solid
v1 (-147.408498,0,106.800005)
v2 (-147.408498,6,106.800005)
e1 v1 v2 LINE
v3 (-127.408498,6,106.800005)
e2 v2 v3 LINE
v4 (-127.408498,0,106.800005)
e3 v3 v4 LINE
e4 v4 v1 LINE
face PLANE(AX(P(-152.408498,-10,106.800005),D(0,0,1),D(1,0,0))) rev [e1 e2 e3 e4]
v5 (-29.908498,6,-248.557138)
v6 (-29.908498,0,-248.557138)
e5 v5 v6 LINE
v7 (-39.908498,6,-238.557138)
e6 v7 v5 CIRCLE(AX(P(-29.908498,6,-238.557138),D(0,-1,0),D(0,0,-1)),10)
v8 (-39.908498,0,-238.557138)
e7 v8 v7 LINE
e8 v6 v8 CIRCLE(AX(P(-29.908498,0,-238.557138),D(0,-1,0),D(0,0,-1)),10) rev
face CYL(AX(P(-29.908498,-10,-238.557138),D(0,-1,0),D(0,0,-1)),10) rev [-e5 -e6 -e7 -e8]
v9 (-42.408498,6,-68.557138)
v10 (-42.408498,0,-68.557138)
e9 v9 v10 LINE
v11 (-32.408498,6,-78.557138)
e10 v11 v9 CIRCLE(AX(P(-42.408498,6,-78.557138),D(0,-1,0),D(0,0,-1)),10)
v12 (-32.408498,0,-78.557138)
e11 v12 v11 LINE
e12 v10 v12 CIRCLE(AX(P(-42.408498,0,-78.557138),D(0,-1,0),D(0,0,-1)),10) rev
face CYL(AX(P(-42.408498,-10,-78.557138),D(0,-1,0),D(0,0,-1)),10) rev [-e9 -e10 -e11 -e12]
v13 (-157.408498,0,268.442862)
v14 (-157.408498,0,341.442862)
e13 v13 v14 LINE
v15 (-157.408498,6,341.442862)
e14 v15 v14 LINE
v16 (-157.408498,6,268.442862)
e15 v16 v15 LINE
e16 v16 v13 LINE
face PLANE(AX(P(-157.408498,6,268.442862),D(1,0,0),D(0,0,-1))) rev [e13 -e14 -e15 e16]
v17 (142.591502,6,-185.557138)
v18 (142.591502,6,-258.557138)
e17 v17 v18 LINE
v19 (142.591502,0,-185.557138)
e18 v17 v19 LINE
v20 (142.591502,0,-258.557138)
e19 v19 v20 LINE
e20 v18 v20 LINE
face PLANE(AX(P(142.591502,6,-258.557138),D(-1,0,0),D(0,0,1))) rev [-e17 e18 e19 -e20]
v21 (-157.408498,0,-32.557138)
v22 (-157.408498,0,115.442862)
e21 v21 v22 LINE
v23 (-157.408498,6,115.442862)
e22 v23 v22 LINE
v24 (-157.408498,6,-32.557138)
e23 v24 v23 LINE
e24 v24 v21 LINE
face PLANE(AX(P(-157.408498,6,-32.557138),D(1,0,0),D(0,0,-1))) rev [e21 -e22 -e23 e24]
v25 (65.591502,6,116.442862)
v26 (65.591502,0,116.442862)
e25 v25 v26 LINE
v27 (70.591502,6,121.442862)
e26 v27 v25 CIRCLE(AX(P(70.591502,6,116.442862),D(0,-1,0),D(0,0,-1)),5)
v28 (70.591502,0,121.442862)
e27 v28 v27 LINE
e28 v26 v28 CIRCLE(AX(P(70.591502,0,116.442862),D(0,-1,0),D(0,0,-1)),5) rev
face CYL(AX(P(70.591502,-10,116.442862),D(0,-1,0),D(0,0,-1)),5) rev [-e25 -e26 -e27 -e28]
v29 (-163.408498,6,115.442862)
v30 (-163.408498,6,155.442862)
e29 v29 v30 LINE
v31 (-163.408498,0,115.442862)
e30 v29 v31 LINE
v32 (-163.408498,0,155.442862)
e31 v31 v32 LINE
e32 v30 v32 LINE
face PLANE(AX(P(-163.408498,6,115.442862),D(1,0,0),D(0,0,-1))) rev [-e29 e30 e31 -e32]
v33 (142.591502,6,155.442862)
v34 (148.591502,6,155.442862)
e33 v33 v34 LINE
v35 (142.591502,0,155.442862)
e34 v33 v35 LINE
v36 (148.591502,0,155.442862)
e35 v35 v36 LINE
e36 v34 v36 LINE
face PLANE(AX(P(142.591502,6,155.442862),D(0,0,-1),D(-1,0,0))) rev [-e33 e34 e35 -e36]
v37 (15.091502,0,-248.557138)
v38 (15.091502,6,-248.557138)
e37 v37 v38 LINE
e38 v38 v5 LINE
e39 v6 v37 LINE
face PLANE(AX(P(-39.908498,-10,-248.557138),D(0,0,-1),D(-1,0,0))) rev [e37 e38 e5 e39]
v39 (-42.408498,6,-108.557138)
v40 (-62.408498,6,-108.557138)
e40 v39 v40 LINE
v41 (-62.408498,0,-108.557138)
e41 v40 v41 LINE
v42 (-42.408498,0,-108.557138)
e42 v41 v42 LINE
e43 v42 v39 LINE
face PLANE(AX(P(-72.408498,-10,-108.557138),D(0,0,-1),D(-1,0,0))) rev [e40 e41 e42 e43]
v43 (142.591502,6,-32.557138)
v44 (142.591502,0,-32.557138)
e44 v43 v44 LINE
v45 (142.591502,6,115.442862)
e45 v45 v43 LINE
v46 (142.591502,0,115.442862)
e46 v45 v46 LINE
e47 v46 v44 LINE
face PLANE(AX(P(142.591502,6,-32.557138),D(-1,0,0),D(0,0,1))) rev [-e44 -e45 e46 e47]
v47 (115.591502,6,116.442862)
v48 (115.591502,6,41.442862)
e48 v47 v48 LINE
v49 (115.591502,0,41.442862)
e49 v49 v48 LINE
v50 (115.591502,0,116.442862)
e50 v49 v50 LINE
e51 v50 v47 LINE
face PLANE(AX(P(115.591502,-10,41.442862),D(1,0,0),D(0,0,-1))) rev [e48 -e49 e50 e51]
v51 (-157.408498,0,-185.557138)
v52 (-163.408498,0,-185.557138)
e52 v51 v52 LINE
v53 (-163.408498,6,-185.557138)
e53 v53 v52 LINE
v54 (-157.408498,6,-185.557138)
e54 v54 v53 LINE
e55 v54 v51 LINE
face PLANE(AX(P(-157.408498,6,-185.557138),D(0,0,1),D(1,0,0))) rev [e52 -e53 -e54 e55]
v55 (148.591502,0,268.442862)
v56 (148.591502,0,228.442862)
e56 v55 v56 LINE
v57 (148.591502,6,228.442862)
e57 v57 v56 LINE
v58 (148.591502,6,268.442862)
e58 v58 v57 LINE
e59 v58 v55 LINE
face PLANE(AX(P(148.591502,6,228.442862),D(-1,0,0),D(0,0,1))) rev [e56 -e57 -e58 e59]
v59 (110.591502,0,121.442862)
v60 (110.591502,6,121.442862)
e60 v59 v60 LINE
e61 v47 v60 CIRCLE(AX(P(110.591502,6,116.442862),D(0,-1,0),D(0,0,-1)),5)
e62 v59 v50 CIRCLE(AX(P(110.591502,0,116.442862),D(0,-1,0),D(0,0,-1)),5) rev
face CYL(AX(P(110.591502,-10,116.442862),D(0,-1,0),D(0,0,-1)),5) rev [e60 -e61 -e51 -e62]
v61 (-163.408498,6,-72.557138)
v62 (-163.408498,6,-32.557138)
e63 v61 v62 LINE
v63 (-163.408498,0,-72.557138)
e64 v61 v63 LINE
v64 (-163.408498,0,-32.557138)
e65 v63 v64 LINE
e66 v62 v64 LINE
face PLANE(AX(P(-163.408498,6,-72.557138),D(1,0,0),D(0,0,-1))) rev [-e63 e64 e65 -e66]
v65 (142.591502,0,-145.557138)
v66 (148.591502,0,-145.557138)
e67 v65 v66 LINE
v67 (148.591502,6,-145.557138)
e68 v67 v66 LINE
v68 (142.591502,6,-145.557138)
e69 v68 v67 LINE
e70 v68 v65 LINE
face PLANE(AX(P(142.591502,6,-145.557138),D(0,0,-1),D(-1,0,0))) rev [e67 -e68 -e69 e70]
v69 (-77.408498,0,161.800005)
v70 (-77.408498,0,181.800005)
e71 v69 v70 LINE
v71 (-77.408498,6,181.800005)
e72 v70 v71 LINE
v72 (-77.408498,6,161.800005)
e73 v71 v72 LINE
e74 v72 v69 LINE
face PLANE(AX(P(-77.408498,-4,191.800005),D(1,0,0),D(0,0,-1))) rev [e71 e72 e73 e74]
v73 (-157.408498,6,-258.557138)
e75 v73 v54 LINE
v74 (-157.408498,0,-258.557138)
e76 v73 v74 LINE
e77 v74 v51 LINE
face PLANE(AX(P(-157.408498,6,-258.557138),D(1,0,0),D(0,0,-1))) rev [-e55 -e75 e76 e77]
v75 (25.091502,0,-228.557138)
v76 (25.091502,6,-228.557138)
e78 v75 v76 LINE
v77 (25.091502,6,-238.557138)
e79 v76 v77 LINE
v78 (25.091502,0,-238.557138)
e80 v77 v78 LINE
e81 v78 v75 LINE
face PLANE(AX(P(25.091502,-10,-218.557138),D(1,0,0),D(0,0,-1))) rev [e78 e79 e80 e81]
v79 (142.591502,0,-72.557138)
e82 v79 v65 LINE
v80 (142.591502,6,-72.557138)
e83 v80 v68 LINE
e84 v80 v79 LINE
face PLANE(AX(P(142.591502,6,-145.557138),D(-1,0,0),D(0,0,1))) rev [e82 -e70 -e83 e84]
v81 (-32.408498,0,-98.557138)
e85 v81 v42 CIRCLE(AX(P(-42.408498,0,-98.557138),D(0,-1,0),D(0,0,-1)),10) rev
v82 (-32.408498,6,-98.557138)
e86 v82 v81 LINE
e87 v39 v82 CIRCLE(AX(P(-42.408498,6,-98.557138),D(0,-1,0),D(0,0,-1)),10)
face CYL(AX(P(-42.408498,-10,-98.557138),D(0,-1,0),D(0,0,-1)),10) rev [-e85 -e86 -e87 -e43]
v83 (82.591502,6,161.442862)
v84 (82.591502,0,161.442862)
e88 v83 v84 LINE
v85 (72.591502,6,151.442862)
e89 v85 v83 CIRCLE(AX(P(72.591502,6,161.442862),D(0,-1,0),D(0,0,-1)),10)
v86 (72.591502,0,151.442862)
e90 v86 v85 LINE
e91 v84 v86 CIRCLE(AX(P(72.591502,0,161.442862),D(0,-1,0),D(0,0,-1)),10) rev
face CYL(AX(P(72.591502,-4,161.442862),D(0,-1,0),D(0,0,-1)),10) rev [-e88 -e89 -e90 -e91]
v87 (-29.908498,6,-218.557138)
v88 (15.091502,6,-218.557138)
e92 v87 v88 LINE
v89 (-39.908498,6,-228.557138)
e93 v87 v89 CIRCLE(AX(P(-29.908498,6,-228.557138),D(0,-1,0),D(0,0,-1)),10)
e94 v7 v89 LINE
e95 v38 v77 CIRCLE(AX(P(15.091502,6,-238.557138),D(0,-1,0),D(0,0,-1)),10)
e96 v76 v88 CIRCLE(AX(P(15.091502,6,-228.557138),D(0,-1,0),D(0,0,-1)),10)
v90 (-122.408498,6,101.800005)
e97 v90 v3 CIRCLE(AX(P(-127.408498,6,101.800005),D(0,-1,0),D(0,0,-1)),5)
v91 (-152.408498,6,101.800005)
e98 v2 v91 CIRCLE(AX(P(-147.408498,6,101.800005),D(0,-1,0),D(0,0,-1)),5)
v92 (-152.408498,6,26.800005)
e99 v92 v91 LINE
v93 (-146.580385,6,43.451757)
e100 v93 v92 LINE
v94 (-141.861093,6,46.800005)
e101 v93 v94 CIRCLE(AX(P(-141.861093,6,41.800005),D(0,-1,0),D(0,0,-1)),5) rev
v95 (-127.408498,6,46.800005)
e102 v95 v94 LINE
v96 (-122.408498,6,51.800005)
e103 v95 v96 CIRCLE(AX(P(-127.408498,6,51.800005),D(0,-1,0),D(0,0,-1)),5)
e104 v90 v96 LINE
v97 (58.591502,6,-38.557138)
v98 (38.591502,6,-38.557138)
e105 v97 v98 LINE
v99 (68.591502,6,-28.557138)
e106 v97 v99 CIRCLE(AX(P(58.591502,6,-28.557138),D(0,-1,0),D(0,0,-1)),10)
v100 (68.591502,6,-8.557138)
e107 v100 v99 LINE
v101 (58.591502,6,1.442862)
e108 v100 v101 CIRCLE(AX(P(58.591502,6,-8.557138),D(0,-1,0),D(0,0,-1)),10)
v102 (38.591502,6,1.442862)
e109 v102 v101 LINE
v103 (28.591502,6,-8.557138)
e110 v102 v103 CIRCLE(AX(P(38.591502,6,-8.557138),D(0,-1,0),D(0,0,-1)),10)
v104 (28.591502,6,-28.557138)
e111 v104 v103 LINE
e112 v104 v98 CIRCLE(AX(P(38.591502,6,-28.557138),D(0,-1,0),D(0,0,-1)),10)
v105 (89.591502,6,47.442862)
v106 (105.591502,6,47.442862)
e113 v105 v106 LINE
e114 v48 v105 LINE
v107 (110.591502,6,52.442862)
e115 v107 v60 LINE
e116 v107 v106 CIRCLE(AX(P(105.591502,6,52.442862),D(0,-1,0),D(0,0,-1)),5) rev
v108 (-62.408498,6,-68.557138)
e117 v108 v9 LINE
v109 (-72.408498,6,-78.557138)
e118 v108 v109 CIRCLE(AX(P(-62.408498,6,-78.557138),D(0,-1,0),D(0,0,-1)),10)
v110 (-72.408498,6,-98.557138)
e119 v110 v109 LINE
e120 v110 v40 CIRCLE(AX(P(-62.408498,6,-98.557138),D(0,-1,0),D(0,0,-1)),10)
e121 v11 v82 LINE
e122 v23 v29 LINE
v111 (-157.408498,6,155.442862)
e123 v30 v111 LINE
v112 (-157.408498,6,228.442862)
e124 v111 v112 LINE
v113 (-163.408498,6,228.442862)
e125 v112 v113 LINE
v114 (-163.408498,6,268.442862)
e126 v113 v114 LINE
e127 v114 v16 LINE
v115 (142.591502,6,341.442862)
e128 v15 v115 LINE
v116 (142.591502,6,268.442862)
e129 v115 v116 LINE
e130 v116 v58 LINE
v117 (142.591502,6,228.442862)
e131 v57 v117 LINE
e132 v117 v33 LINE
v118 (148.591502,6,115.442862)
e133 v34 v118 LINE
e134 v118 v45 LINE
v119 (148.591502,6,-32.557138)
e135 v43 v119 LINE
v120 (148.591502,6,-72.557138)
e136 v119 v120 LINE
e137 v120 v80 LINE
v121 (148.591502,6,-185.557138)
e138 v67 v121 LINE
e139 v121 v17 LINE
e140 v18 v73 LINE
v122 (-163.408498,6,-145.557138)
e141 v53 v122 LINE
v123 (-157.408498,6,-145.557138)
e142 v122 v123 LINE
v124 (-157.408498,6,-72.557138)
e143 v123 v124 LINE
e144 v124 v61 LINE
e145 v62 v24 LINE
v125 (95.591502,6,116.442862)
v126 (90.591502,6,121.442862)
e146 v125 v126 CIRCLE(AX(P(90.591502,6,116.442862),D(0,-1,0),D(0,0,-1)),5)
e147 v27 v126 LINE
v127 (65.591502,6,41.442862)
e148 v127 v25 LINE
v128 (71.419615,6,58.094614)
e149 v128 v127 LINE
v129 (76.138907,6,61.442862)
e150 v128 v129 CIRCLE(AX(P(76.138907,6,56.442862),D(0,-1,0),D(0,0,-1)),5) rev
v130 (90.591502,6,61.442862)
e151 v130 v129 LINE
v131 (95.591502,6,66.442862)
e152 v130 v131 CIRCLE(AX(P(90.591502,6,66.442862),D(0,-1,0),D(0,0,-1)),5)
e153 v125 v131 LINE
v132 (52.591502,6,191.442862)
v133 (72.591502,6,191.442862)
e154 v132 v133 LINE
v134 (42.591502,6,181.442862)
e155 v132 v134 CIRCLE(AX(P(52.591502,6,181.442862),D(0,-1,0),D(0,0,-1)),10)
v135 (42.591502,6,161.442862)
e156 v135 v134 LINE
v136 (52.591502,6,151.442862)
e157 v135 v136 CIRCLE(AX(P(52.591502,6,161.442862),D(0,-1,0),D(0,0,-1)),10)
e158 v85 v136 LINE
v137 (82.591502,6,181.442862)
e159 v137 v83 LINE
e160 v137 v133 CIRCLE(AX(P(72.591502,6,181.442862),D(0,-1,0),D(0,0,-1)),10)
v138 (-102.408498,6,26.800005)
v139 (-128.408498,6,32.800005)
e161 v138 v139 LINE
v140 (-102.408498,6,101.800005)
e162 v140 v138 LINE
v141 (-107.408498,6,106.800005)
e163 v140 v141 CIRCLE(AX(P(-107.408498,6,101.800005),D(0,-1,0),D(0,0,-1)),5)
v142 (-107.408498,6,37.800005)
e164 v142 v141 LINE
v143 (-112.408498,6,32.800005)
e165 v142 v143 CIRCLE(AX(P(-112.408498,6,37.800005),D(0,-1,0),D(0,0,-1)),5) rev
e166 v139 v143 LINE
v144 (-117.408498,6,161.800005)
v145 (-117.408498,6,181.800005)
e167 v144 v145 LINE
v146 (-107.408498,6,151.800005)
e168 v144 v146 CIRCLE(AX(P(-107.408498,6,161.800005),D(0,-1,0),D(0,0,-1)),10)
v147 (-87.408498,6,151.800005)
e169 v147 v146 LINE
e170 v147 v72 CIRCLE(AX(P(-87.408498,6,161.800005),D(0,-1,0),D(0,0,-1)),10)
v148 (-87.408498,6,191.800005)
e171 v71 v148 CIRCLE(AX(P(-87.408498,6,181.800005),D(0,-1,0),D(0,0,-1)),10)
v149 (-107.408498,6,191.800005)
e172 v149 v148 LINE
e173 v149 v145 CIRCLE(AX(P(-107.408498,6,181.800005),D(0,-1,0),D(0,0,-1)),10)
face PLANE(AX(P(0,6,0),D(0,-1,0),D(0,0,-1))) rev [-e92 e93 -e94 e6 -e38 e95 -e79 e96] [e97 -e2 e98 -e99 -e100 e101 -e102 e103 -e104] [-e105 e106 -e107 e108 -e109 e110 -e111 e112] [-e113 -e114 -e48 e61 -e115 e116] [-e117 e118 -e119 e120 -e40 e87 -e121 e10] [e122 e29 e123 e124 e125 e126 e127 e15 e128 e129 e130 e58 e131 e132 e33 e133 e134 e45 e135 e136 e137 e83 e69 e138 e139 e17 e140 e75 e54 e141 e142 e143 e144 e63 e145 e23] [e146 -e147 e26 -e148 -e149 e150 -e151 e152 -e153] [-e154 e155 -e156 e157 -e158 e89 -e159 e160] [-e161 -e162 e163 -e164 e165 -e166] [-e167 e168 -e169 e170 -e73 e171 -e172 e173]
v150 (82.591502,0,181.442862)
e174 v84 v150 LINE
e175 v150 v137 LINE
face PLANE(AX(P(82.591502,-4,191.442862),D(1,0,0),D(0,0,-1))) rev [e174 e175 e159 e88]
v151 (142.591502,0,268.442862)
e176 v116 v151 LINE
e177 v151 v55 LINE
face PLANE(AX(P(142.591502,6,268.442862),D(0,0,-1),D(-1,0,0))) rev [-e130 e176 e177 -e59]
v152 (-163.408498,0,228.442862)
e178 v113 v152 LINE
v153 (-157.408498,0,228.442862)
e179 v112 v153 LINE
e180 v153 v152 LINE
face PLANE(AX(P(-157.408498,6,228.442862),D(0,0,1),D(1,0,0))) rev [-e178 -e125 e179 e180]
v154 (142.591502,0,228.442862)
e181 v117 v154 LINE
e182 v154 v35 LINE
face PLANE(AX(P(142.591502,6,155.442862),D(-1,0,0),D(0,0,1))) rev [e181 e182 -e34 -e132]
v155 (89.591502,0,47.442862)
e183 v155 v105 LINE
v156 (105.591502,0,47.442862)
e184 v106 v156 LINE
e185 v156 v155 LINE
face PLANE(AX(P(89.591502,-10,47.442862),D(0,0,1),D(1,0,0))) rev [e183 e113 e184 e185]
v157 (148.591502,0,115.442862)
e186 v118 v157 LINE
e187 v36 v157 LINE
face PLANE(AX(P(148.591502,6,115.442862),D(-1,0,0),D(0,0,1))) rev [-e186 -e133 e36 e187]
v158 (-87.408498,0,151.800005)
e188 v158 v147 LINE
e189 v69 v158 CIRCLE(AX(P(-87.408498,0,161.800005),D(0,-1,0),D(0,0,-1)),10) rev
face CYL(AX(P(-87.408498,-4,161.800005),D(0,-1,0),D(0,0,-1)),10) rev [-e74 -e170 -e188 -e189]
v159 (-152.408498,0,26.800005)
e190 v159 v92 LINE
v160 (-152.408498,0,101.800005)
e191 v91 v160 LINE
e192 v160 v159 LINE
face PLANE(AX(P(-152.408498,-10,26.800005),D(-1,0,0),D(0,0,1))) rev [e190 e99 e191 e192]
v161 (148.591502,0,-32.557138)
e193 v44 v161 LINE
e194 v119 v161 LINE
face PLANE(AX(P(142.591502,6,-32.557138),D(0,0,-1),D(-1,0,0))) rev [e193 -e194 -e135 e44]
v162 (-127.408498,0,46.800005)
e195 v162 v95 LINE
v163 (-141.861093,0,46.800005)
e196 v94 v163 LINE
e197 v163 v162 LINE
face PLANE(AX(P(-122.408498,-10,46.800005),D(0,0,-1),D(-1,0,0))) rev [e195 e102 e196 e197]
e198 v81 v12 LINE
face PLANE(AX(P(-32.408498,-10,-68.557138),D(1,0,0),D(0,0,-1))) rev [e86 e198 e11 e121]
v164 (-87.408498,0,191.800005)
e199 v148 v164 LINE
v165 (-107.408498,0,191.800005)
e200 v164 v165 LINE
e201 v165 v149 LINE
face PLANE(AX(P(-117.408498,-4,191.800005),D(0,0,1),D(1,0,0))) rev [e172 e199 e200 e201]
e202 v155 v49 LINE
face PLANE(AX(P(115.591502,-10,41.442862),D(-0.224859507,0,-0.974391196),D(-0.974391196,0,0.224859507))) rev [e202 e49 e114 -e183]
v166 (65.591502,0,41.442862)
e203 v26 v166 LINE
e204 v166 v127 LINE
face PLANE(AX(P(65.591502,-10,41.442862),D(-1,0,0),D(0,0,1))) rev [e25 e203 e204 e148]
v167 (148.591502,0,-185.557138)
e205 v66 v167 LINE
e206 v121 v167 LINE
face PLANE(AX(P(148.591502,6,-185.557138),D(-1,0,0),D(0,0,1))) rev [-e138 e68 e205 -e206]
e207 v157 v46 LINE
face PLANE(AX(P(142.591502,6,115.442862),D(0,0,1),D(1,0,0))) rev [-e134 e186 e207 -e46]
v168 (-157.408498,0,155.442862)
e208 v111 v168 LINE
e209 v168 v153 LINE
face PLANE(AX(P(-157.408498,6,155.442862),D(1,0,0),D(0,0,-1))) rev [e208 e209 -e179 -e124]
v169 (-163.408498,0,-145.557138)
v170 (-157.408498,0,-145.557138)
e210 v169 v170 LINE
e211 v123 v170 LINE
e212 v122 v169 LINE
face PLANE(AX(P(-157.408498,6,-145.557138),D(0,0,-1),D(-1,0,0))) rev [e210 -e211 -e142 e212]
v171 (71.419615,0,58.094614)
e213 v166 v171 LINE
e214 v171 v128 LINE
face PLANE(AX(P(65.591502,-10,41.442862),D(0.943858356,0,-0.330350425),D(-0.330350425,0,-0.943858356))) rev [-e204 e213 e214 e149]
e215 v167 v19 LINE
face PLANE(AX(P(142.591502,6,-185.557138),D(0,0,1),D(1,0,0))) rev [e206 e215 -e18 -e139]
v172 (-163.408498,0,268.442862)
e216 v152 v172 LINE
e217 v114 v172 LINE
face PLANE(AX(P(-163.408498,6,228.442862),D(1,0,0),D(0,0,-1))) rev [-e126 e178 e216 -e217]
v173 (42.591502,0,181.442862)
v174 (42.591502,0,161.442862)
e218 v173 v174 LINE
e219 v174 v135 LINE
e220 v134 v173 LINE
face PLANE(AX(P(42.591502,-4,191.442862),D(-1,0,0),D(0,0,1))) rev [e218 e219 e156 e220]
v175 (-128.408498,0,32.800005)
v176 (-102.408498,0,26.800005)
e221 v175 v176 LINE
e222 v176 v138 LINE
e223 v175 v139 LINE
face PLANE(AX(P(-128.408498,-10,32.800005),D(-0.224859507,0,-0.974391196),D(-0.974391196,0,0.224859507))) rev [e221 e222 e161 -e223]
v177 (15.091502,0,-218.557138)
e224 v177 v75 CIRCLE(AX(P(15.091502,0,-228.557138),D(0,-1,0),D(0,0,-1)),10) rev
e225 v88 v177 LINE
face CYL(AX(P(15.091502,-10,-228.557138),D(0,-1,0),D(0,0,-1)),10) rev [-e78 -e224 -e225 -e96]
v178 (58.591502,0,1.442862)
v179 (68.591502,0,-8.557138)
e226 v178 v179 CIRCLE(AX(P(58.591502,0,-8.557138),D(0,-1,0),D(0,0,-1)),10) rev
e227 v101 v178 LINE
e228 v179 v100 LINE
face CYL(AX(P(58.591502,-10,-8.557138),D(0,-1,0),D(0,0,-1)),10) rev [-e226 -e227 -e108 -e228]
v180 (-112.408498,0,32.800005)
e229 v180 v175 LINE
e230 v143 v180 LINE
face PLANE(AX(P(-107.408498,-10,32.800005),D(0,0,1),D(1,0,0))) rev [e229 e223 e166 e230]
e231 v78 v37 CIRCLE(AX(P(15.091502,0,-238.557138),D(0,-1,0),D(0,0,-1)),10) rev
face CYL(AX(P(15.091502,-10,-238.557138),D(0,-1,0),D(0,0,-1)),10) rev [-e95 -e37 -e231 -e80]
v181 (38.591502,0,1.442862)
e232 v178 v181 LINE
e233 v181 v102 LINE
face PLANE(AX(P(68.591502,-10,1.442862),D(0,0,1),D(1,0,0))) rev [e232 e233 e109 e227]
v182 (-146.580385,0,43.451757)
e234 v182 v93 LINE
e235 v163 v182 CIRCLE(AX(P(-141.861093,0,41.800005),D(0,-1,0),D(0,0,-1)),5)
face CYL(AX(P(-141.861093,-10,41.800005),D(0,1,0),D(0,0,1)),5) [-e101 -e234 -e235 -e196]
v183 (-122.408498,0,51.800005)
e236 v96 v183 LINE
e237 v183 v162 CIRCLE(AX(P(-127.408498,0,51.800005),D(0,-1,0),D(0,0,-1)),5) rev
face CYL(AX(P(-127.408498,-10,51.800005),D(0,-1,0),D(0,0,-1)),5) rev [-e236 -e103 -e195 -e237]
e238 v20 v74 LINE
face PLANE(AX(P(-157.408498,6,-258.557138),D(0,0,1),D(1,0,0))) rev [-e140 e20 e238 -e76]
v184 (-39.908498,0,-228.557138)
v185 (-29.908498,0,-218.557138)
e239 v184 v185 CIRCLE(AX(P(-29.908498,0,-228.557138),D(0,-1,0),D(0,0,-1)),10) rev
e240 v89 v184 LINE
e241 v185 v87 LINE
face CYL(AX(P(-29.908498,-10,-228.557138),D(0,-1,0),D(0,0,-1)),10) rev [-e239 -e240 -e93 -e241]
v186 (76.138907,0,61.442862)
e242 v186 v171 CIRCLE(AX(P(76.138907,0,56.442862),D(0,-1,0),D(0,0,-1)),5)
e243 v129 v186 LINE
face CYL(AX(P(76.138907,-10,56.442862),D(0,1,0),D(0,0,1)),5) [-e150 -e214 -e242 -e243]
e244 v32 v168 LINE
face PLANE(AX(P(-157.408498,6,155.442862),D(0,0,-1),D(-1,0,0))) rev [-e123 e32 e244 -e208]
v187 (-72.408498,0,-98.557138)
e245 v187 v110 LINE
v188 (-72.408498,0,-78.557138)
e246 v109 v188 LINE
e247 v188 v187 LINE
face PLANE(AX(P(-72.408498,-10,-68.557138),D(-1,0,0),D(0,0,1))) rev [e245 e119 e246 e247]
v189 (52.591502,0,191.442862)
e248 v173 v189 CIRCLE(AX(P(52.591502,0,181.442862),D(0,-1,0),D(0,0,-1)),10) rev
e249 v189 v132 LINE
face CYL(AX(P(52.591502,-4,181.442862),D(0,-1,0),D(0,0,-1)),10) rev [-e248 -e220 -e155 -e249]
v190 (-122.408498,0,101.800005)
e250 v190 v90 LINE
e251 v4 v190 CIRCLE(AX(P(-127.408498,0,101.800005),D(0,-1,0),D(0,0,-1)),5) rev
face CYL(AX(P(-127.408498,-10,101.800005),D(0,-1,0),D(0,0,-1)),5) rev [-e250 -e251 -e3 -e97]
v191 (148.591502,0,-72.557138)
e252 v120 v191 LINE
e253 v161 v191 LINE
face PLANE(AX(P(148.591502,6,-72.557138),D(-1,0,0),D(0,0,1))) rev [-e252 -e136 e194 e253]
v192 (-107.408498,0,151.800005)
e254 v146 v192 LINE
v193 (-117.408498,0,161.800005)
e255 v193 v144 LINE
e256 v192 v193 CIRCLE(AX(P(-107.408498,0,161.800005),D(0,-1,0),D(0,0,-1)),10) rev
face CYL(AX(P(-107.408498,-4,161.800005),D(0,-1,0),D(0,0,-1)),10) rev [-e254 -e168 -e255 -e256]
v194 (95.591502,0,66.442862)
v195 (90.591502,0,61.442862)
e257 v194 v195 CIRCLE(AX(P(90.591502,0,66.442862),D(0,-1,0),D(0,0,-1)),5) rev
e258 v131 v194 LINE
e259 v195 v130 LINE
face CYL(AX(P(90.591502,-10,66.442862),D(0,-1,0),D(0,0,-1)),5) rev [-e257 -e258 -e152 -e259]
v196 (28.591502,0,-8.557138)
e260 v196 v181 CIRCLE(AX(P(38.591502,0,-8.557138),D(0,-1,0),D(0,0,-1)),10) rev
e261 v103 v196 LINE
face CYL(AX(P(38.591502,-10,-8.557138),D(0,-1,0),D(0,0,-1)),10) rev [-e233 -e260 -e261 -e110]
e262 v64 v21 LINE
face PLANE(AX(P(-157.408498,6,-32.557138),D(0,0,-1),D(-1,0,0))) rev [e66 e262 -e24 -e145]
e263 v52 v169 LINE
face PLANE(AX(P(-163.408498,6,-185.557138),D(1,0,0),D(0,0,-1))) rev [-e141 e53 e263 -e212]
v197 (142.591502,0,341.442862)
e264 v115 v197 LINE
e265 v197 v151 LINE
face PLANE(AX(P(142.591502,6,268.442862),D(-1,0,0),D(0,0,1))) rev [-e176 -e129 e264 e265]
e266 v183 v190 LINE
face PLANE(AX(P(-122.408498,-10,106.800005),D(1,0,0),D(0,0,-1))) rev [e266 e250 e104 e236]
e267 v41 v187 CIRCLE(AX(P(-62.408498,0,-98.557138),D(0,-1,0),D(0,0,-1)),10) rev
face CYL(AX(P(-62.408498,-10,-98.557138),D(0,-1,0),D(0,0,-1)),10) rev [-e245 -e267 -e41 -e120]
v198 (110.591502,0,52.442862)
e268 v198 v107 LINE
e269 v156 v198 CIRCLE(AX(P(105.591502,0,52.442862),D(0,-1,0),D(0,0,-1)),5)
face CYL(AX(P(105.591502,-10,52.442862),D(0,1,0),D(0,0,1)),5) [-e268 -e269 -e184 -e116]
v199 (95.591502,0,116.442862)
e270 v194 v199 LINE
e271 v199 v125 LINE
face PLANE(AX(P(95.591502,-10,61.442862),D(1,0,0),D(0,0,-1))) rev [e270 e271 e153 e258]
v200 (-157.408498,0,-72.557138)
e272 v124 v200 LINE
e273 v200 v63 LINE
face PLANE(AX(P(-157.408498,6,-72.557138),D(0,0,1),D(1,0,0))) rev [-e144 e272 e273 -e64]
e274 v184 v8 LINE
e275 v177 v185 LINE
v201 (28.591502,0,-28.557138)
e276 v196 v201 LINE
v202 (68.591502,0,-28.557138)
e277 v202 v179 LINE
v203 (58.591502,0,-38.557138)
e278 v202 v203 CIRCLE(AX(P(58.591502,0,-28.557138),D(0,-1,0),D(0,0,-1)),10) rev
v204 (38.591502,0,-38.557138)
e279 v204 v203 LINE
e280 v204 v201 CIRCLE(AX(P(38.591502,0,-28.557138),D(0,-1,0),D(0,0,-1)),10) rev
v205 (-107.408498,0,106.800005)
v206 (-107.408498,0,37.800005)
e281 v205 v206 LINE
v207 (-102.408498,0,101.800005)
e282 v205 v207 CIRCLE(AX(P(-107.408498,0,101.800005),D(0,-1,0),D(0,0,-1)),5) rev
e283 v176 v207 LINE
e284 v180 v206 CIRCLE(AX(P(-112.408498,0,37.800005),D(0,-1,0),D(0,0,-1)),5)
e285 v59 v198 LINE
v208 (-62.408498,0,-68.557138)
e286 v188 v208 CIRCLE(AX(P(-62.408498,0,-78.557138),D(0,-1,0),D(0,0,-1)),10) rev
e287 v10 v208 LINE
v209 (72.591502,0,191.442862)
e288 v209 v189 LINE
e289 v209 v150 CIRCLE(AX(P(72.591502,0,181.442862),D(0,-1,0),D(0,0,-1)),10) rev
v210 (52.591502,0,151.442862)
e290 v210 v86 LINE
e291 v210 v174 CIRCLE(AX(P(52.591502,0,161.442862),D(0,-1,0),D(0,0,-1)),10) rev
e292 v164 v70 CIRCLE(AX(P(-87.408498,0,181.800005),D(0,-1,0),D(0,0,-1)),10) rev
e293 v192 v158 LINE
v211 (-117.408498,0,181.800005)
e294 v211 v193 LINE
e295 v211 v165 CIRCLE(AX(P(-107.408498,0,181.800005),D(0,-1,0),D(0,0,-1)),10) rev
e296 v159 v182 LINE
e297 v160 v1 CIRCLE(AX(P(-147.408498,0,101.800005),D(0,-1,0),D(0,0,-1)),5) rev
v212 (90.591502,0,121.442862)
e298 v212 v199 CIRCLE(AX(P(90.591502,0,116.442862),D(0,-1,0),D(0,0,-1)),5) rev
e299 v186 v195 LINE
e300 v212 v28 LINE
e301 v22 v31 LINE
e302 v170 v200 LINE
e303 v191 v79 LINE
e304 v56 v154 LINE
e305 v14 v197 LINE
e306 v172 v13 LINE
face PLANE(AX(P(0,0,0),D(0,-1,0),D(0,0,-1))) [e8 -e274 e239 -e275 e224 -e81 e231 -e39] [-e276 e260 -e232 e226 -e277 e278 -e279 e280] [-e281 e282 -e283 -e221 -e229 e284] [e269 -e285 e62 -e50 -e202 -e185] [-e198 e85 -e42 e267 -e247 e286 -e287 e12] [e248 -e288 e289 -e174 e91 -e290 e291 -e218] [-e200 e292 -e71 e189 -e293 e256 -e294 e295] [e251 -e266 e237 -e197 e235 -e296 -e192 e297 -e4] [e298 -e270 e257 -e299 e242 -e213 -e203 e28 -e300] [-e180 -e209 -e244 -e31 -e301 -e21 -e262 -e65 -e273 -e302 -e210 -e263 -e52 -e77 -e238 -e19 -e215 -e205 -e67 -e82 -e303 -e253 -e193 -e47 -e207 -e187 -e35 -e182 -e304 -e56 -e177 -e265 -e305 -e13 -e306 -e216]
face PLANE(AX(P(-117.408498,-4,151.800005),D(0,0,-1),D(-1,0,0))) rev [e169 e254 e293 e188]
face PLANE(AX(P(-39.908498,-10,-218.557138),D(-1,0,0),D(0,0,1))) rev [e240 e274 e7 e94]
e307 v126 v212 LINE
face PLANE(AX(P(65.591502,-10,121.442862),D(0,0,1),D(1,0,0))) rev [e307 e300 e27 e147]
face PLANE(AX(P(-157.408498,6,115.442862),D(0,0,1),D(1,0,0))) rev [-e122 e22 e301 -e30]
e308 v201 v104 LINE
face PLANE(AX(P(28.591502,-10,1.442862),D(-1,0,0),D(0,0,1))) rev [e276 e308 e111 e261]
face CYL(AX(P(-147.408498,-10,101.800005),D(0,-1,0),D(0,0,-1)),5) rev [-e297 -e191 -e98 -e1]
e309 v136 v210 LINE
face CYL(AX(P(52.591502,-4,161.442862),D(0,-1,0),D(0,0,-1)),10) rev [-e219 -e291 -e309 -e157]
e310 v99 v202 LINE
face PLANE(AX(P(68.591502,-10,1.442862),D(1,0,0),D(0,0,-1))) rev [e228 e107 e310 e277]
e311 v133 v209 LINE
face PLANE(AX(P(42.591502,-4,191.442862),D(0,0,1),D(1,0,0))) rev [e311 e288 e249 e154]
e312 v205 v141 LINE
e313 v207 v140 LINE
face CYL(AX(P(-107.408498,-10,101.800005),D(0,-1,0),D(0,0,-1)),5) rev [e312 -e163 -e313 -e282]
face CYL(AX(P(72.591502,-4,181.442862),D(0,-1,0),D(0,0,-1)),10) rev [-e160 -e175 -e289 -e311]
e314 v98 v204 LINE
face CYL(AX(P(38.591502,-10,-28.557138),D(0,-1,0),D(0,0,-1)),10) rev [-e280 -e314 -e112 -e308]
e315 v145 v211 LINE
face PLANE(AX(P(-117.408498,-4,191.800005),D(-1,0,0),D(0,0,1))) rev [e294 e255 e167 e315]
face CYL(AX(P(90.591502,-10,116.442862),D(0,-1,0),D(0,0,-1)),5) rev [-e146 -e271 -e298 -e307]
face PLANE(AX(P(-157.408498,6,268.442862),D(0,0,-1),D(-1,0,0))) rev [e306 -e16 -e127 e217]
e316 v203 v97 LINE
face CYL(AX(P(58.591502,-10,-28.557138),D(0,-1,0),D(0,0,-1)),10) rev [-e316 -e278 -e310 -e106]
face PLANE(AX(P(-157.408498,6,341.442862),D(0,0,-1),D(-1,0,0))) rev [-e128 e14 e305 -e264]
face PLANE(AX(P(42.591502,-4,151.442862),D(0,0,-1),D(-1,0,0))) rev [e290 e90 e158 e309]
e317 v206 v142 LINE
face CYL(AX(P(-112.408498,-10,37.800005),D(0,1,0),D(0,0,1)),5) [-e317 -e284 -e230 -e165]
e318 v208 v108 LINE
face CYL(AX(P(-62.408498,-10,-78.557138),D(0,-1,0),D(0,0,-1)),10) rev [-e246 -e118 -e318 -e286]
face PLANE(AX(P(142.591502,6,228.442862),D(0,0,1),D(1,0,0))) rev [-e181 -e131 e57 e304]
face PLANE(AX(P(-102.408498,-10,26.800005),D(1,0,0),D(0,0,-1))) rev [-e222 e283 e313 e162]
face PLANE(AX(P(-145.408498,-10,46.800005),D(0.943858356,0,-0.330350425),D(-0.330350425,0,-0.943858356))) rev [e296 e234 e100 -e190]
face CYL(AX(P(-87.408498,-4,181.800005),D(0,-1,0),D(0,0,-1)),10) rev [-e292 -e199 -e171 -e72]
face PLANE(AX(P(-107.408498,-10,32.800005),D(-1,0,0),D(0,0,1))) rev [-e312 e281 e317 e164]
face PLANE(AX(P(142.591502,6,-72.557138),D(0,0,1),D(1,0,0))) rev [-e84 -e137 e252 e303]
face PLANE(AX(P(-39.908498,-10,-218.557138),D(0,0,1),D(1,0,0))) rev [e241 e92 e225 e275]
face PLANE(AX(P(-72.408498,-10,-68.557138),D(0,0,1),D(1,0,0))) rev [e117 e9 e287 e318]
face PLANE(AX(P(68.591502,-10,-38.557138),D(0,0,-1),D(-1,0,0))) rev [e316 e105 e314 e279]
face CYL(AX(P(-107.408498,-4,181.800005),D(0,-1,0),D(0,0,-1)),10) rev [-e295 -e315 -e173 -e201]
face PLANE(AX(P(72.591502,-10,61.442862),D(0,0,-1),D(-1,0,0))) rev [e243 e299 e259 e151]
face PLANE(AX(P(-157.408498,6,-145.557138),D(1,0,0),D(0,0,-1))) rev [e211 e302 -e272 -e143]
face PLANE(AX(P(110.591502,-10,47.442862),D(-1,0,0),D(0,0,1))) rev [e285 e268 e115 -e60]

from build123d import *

# Parameters (mm, degrees)
BOSS_EXTRUDE1_DEPTH = 6
SKETCH2_W           = 40
SKETCH2_H           = 40
CUT_EXTRUDE1_DEPTH  = 10
FILLET1_R           = 10
CUT_EXTRUDE4_DEPTH  = 16
FILLET2_R           = 5
FILLET3_R           = 5
CUT_EXTRUDE5_DEPTH  = 16
FILLET4_R           = 5
SKETCH5_W           = 40
SKETCH5_H           = 40
CUT_EXTRUDE6_DEPTH  = 16
FILLET5_R           = 10
SKETCH6_W           = 65
SKETCH6_H           = 30
CUT_EXTRUDE7_DEPTH  = 16
FILLET6_R           = 10


with BuildPart() as part:
    # Sketch1 → Boss-Extrude1 (new body)
    with BuildSketch(Plane(origin=(0, 0, 0), x_dir=(1, 0, 0), z_dir=(0, 1, 0))):
        Polygon((-157.408498061, 145.557138299), (-157.408498061, 72.557138299), (-163.408498061, 72.557138299), (-163.408498061, 32.557138299), (-157.408498061, 32.557138299), (-157.408498061, -115.442861701), (-163.408498061, -115.442861701), (-163.408498061, -155.442861701), (-157.408498061, -155.442861701), (-157.408498061, -228.442861701), (-163.408498061, -228.442861701), (-163.408498061, -268.442861701), (-157.408498061, -268.442861701), (-157.408498061, -341.442861701), (142.591501939, -341.442861701), (142.591501939, -268.442861701), (148.591501939, -268.442861701), (148.591501939, -228.442861701), (142.591501939, -228.442861701), (142.591501939, -155.442861701), (148.591501939, -155.442861701), (148.591501939, -115.442861701), (142.591501939, -115.442861701), (142.591501939, 32.557138299), (148.591501939, 32.557138299), (148.591501939, 72.557138299), (142.591501939, 72.557138299), (142.591501939, 145.557138299), (148.591501939, 145.557138299), (148.591501939, 185.557138299), (142.591501939, 185.557138299), (142.591501939, 258.557138299), (-157.408498061, 258.557138299), (-157.408498061, 185.557138299), (-163.408498061, 185.557138299), (-163.408498061, 145.557138299), align=None)
    extrude(amount=BOSS_EXTRUDE1_DEPTH)

    # Sketch2 → Cut-Extrude1 (cut)
    with BuildSketch(Plane(origin=(0, 6, 0), x_dir=(1, 0, 0), z_dir=(0, 1, 0))):
        with Locations((-97.408498061, -171.800004558)):
            Rectangle(SKETCH2_W, SKETCH2_H)
        with Locations((62.591501939, -171.442861701)):
            Rectangle(SKETCH2_W, SKETCH2_H)
    extrude(amount=-CUT_EXTRUDE1_DEPTH, mode=Mode.SUBTRACT)

    # Fillet1
    fillet1_edges = [part.edges().sort_by_distance(p)[0] for p in [
        (-117.408498061, 3, 191.800004558),
        (-117.408498061, 3, 151.800004558),
        (-77.408498061, 3, 151.800004558),
        (-77.408498061, 3, 191.800004558),
        (42.591501939, 3, 191.442861701),
        (42.591501939, 3, 151.442861701),
        (82.591501939, 3, 151.442861701),
        (82.591501939, 3, 191.442861701),
    ]]
    fillet(fillet1_edges, radius=FILLET1_R)

    # Sketch3 → Cut-Extrude4 (cut)
    with BuildSketch(Plane(origin=(0, 6, 0), x_dir=(1, 0, 0), z_dir=(0, 1, 0))):
        Polygon((-102.408498061, -26.800004558), (-102.408498061, -106.800004558), (-107.408498061, -106.800004558), (-107.408498061, -32.800004558), (-128.408498061, -32.800004558), align=None)
        Polygon((-152.408498061, -106.800004558), (-122.408498061, -106.800004558), (-122.408498061, -46.800004558), (-145.408498061, -46.800004558), (-152.408498061, -26.800004558), align=None)
    extrude(amount=-CUT_EXTRUDE4_DEPTH, mode=Mode.SUBTRACT)

    # Fillet2
    fillet2_edges = [part.edges().sort_by_distance(p)[0] for p in [
        (-107.408498061, 3, 32.800004558),
        (-145.408498061, 3, 46.800004558),
        (-122.408498061, 3, 46.800004558),
    ]]
    fillet(fillet2_edges, radius=FILLET2_R)

    # Fillet3
    fillet3_edges = [part.edges().sort_by_distance(p)[0] for p in [
        (-102.408498061, 3, 106.800004558),
        (-152.408498061, 3, 106.800004558),
        (-122.408498061, 3, 106.800004558),
    ]]
    fillet(fillet3_edges, radius=FILLET3_R - 0.0001)  # a hair under: the kernel refuses the full size

    # Sketch4 → Cut-Extrude5 (cut)
    with BuildSketch(Plane(origin=(0, 6, 0), x_dir=(1, 0, 0), z_dir=(0, 1, 0))):
        Polygon((65.591501939, -41.442861701), (65.591501939, -121.442861701), (95.591501939, -121.442861701), (95.591501939, -61.442861701), (72.591501939, -61.442861701), align=None)
        Polygon((115.591501939, -41.442861701), (89.591501939, -47.442861701), (110.591501939, -47.442861701), (110.591501939, -121.442861701), (115.591501939, -121.442861701), align=None)
    extrude(amount=-CUT_EXTRUDE5_DEPTH, mode=Mode.SUBTRACT)

    # Fillet4
    fillet4_edges = [part.edges().sort_by_distance(p)[0] for p in [
        (115.591501939, 3, 121.442861701),
        (110.591501939, 3, 47.442861701),
        (72.591501939, 3, 61.442861701),
        (95.591501939, 3, 61.442861701),
        (95.591501939, 3, 121.442861701),
        (65.591501939, 3, 121.442861701),
    ]]
    fillet(fillet4_edges, radius=FILLET4_R - 0.0001)  # a hair under: the kernel refuses the full size

    # Sketch5 → Cut-Extrude6 (cut)
    with BuildSketch(Plane(origin=(0, 6, 0), x_dir=(1, 0, 0), z_dir=(0, 1, 0))):
        with Locations((-52.408498061, 88.557138299)):
            Rectangle(SKETCH5_W, SKETCH5_H)
        with Locations((48.591501939, 18.557138299)):
            Rectangle(SKETCH5_W, SKETCH5_H)
    extrude(amount=-CUT_EXTRUDE6_DEPTH, mode=Mode.SUBTRACT)

    # Fillet5
    fillet5_edges = [part.edges().sort_by_distance(p)[0] for p in [
        (-32.408498061, 3, -108.557138299),
        (-32.408498061, 3, -68.557138299),
        (-72.408498061, 3, -68.557138299),
        (-72.408498061, 3, -108.557138299),
        (28.591501939, 3, 1.442861701),
        (28.591501939, 3, -38.557138299),
        (68.591501939, 3, -38.557138299),
        (68.591501939, 3, 1.442861701),
    ]]
    fillet(fillet5_edges, radius=FILLET5_R)

    # Sketch6 → Cut-Extrude7 (cut)
    with BuildSketch(Plane(origin=(0, 6, 0), x_dir=(1, 0, 0), z_dir=(0, 1, 0))):
        with Locations((-7.408498061, 233.557138299)):
            Rectangle(SKETCH6_W, SKETCH6_H)
    extrude(amount=-CUT_EXTRUDE7_DEPTH, mode=Mode.SUBTRACT)

    # Fillet6
    fillet6_edges = [part.edges().sort_by_distance(p)[0] for p in [
        (25.091501939, 3, -248.557138299),
        (25.091501939, 3, -218.557138299),
        (-39.908498061, 3, -218.557138299),
        (-39.908498061, 3, -248.557138299),
    ]]
    fillet(fillet6_edges, radius=FILLET6_R)


solid = part.part
